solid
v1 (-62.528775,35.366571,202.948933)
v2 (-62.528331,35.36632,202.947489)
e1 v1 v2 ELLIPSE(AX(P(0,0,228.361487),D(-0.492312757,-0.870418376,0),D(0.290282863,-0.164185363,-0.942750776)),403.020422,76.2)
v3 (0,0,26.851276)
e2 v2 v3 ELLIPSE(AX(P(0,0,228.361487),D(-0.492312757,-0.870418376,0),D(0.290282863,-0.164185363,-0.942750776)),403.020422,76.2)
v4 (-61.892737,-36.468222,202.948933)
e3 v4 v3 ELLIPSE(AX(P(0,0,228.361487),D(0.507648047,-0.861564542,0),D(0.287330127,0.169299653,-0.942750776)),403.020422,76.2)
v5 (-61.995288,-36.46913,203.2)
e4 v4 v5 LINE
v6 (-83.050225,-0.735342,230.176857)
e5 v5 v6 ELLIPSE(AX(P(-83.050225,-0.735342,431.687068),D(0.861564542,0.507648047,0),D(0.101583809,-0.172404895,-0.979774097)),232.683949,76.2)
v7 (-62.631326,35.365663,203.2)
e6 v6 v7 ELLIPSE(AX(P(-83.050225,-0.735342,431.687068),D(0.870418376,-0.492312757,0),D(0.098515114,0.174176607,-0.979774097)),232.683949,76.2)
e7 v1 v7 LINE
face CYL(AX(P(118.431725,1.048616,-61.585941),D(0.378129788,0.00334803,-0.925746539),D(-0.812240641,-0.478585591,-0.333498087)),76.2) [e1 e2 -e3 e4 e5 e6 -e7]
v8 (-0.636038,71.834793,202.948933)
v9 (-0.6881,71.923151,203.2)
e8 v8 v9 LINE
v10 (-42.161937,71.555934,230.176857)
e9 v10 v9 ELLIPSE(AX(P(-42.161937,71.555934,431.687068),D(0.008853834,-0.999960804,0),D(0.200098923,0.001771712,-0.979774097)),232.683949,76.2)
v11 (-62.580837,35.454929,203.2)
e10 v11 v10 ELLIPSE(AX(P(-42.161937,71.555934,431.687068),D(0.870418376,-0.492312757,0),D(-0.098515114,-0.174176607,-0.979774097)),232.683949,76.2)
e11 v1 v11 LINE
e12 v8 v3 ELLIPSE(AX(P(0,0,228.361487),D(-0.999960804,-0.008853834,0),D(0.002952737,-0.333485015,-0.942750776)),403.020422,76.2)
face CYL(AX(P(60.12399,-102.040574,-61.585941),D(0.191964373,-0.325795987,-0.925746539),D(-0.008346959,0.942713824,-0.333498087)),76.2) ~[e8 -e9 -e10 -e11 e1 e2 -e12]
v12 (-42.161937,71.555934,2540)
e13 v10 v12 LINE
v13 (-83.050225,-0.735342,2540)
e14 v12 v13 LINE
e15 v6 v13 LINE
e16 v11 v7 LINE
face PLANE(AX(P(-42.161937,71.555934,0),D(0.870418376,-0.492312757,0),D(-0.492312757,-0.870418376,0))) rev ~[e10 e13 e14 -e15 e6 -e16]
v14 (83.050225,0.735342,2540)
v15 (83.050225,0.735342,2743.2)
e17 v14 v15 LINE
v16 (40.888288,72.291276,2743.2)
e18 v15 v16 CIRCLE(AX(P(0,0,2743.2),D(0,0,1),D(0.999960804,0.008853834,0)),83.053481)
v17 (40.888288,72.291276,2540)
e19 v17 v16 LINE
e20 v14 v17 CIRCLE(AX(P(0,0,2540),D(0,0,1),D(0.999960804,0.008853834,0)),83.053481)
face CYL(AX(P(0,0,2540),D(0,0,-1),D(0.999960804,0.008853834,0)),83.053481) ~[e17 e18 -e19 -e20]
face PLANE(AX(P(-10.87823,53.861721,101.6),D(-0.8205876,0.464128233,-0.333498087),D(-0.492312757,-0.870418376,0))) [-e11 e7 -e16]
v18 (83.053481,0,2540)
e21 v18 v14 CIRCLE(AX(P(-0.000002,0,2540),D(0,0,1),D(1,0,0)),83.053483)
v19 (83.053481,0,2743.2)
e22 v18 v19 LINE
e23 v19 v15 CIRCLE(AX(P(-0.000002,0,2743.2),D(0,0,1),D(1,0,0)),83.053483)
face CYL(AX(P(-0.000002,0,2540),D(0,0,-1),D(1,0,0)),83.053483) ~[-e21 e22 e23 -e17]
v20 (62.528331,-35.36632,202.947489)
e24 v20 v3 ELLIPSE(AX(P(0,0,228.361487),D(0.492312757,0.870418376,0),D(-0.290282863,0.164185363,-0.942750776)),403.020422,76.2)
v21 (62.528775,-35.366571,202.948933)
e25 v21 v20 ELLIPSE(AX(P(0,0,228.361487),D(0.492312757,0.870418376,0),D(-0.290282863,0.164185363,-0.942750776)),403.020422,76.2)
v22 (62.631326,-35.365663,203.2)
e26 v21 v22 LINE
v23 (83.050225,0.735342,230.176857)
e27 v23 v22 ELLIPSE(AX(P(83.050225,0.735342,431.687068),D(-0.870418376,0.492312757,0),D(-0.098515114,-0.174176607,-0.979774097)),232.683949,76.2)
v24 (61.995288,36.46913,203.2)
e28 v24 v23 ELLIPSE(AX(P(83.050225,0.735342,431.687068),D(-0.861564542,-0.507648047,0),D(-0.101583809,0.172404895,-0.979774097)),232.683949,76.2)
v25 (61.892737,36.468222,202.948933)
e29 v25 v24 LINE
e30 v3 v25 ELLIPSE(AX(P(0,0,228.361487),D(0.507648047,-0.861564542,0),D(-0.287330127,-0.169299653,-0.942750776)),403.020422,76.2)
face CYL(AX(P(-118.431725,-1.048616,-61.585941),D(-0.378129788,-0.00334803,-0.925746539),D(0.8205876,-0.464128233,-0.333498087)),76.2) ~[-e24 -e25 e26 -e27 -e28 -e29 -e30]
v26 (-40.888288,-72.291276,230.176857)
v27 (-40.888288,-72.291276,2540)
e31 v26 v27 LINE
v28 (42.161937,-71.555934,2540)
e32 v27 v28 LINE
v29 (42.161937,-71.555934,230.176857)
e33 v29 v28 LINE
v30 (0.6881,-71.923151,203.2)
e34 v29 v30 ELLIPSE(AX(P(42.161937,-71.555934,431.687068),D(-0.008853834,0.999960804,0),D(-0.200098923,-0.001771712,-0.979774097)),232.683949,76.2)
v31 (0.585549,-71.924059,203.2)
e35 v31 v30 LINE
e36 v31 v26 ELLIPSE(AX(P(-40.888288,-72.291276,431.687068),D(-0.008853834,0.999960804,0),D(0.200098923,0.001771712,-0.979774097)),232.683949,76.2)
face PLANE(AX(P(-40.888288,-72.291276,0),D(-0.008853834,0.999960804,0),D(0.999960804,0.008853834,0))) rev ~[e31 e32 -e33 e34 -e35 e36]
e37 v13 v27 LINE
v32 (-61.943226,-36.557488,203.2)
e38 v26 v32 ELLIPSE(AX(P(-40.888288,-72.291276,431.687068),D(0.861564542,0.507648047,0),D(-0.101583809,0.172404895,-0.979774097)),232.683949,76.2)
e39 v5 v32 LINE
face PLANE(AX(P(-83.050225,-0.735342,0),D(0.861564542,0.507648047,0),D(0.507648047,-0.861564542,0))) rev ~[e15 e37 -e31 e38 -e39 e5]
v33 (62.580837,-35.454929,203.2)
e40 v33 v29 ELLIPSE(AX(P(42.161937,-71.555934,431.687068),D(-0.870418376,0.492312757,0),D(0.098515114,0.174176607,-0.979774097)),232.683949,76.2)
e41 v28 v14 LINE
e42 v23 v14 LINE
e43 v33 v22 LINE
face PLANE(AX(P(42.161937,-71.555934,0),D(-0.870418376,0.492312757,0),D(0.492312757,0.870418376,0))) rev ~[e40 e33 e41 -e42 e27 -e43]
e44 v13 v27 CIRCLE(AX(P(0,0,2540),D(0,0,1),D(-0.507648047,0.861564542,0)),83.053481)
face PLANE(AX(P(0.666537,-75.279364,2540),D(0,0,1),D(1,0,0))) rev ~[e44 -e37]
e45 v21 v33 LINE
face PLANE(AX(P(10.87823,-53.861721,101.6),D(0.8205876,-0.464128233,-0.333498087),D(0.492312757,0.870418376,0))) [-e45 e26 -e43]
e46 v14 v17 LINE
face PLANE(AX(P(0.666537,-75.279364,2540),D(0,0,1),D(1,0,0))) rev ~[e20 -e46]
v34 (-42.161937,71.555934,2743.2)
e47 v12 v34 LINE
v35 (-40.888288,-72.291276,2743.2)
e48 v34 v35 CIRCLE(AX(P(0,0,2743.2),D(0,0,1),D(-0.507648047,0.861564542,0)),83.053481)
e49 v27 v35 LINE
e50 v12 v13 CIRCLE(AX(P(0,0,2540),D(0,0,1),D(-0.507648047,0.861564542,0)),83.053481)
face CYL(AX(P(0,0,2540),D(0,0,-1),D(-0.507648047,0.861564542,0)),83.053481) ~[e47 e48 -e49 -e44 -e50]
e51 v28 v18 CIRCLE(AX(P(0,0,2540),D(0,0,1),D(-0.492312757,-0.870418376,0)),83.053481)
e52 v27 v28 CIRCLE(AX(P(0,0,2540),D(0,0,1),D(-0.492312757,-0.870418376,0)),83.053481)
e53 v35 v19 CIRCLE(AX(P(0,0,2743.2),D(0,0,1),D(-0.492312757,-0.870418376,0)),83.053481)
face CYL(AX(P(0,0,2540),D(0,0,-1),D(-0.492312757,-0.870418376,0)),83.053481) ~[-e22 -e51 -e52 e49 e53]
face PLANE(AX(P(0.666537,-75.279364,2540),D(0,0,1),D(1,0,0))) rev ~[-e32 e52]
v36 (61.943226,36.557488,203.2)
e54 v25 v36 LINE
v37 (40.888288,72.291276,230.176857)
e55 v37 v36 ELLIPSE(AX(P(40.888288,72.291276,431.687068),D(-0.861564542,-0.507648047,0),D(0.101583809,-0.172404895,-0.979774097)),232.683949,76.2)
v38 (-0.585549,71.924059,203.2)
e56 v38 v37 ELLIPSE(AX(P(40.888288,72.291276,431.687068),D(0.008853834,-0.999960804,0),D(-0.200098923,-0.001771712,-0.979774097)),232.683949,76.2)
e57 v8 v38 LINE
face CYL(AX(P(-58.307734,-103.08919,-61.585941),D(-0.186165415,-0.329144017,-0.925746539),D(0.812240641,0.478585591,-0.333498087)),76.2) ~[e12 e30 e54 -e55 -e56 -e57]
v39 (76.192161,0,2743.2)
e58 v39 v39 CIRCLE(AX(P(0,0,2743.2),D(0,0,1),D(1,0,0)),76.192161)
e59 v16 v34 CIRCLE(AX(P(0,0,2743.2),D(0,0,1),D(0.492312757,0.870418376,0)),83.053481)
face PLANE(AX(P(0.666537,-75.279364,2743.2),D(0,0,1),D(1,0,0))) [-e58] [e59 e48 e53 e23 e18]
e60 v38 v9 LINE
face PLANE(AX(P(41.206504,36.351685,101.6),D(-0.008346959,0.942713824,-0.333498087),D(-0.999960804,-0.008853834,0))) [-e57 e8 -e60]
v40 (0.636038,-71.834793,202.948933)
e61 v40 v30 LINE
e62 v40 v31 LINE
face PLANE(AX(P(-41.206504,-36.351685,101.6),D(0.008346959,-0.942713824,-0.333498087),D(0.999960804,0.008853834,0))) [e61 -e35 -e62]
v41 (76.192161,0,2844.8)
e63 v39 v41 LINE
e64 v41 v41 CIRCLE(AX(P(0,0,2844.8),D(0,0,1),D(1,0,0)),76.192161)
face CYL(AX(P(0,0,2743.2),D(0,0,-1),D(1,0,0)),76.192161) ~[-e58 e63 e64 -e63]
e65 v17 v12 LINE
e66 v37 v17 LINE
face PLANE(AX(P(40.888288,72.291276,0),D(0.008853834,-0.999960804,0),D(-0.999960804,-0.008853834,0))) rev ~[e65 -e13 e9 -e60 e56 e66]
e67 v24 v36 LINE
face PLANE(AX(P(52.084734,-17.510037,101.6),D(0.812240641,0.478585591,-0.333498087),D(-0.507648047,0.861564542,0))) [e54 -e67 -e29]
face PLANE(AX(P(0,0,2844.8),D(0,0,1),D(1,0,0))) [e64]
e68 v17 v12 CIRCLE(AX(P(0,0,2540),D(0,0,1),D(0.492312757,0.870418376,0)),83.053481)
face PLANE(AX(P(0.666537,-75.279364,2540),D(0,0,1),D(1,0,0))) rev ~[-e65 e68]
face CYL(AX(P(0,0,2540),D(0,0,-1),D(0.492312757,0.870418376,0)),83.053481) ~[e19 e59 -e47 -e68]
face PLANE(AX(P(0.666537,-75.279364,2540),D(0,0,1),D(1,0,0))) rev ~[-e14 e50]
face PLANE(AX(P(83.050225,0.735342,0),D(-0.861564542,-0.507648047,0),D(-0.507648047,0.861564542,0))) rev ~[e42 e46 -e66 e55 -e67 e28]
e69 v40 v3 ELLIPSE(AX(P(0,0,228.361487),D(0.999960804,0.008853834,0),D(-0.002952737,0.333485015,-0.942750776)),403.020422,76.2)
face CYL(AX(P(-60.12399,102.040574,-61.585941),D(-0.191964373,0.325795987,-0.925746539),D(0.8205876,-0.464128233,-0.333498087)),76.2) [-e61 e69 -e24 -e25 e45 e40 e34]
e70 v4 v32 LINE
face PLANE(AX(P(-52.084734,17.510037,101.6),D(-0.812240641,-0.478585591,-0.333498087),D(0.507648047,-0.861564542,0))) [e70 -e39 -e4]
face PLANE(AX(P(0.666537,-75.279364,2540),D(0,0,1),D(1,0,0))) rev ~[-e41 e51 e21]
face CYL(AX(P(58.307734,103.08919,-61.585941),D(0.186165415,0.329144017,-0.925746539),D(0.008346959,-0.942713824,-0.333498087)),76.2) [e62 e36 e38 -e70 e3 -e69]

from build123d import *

# Parameters (mm, degrees)
F1_DEPTH     = 2540
F3_DEPTH     = 203.2
F4_R         = 76.1921609871
F5_DEPTH     = 101.6
F6_SIZE2     = 203.2
F6_SIZE      = 71.882
F7_T1_DEPTH  = 494.4083201135
F7_T3_DEPTH  = 494.4083201135
F7_T5_DEPTH  = 494.4083201135
F7_T7_DEPTH  = 494.4083201135
F7_T9_DEPTH  = 494.4083201135
F7_T11_DEPTH = 494.4083201135


# Not quite as in the source:
# - a fillet or chamfer that OpenCascade refuses, or shapes differently, is made with other operations: its cross-section is extruded or revolved along the edge and cut away or added


with BuildPart() as f1:
    # F0 (on Top) → F1 (new body)
    with BuildSketch(Plane.XY):
        Polygon((42.1619373396, -71.5559341018), (83.0502253935, 0.735341758), (40.8882880539, 72.2912758598), (-42.1619373396, 71.5559341018), (-83.0502253935, -0.735341758), (-40.8882880539, -72.2912758598), align=None)
    extrude(amount=F1_DEPTH)

    # F2 (on face) → F3 (join)
    with BuildSketch(Plane.XY.offset(2540)):
        with BuildLine():
            ThreePointArc((-40.8882880539, -72.2912758598), (0.735341758, -83.0502253935), (42.1619373396, -71.5559341018))
            Line((42.1619373396, -71.5559341018), (-40.8882880539, -72.2912758598))
        make_face()
        with BuildLine():
            ThreePointArc((-83.0502253935, -0.735341758), (-71.5559341018, -42.1619373396), (-40.8882880539, -72.2912758598))
            Line((-40.8882880539, -72.2912758598), (-83.0502253935, -0.735341758))
        make_face()
        with BuildLine():
            Line((-83.0502253935, -0.735341758), (-42.1619373396, 71.5559341018))
            ThreePointArc((-42.1619373396, 71.5559341018), (-72.2912758598, 40.8882880539), (-83.0502253935, -0.735341758))
        make_face()
        Polygon((42.1619373396, -71.5559341018), (83.0502253935, 0.735341758), (40.8882880539, 72.2912758598), (-42.1619373396, 71.5559341018), (-83.0502253935, -0.735341758), (-40.8882880539, -72.2912758598), align=None)
        with BuildLine():
            ThreePointArc((42.1619373396, -71.5559341018), (72.1095566371, -41.2079180135), (83.0534807543, 0))
            ThreePointArc((83.0534807543, 0), (83.0526669101, 0.3676744818), (83.0502253935, 0.735341758))
            Line((83.0502253935, 0.735341758), (42.1619373396, -71.5559341018))
        make_face()
        with BuildLine():
            Line((40.8882880539, 72.2912758598), (83.0502253935, 0.735341758))
            ThreePointArc((83.0502253935, 0.735341758), (71.5559341018, 42.1619373396), (40.8882880539, 72.2912758598))
        make_face()
        with BuildLine():
            Line((-42.1619373396, 71.5559341018), (40.8882880539, 72.2912758598))
            ThreePointArc((40.8882880539, 72.2912758598), (-0.735341758, 83.0502253935), (-42.1619373396, 71.5559341018))
        make_face()
    extrude(amount=F3_DEPTH)

    # F4 (on face) → F5 (join)
    with BuildSketch(Plane.XY.offset(2743.2)):
        Circle(F4_R)
    extrude(amount=F5_DEPTH)

    # F6
    f6_edges = [f1.edges().sort_by_distance(p)[0] for p in [
        (62.606081, -35.410296, 0),
        (61.969257, 36.513309, 0),
        (-0.636825, 71.923605, 0),
        (-62.606081, 35.410296, 0),
        (-61.969257, -36.513309, 0),
        (0.636825, -71.923605, 0),
    ]]
    f6_side = f1.faces().sort_by_distance((0, 0, 0))[0]
    chamfer(f6_edges, length=F6_SIZE, length2=F6_SIZE2, reference=f6_side)

    # F7: fillet of radius 76.2 on 6 edges, made by hand

    # F7_s2 → F7_t1 (cut)
    with BuildSketch(Plane(origin=(-18.9514614698, -33.5065465998, -94.2401135792), x_dir=(-0.8704183762, 0.4923127566, 0), z_dir=(0.1861654151, 0.329144017, 0.9257465389))):
        with BuildLine():
            ThreePointArc((-35.9188045712, 19.1503954496), (0, 10.1536652969), (35.9188045712, 19.1503954496))
            Line((35.9188045712, 19.1503954496), (0, -0.0474877004))
            Line((0, -0.0474877004), (-35.9188045712, 19.1503954496))
        make_face()
    extrude(amount=F7_T1_DEPTH, mode=Mode.SUBTRACT)

    # F7_s4 → F7_t3 (cut)
    with BuildSketch(Plane(origin=(19.5417898136, -33.1657203716, -94.2401135792), x_dir=(-0.8615645419, -0.5076480475, 0), z_dir=(-0.1919643727, 0.3257959873, 0.9257465389))):
        with BuildLine():
            ThreePointArc((-35.9188045712, 19.1503954496), (0, 10.1536652969), (35.9188045712, 19.1503954496))
            Line((35.9188045712, 19.1503954496), (0, -0.0474877004))
            Line((0, -0.0474877004), (-35.9188045712, 19.1503954496))
        make_face()
    extrude(amount=F7_T3_DEPTH, mode=Mode.SUBTRACT)

    # F7_s6 → F7_t5 (cut)
    with BuildSketch(Plane(origin=(38.4932512834, 0.3408262282, -94.2401135792), x_dir=(0.0088538343, -0.999960804, 0), z_dir=(-0.3781297878, -0.0033480297, 0.9257465389))):
        with BuildLine():
            ThreePointArc((35.9188045712, 19.1503954496), (0, 10.1536652969), (-35.9188045712, 19.1503954496))
            Line((-35.9188045712, 19.1503954496), (0, -0.0474877004))
            Line((0, -0.0474877004), (35.9188045712, 19.1503954496))
        make_face()
    extrude(amount=F7_T5_DEPTH, mode=Mode.SUBTRACT)

    # F7_s8 → F7_t7 (cut)
    with BuildSketch(Plane(origin=(18.9514614698, 33.5065465998, -94.2401135792), x_dir=(0.8704183762, -0.4923127566, 0), z_dir=(-0.1861654151, -0.329144017, 0.9257465389))):
        with BuildLine():
            ThreePointArc((35.9188045712, 19.1503954496), (0, 10.1536652969), (-35.9188045712, 19.1503954496))
            Line((-35.9188045712, 19.1503954496), (0, -0.0474877004))
            Line((0, -0.0474877004), (35.9188045712, 19.1503954496))
        make_face()
    extrude(amount=F7_T7_DEPTH, mode=Mode.SUBTRACT)

    # F7_s10 → F7_t9 (cut)
    with BuildSketch(Plane(origin=(-19.5417898136, 33.1657203716, -94.2401135792), x_dir=(0.8615645419, 0.5076480475, 0), z_dir=(0.1919643727, -0.3257959873, 0.9257465389))):
        with BuildLine():
            ThreePointArc((35.9188045712, 19.1503954496), (0, 10.1536652969), (-35.9188045712, 19.1503954496))
            Line((-35.9188045712, 19.1503954496), (0, -0.0474877004))
            Line((0, -0.0474877004), (35.9188045712, 19.1503954496))
        make_face()
    extrude(amount=F7_T9_DEPTH, mode=Mode.SUBTRACT)

    # F7_s12 → F7_t11 (cut)
    with BuildSketch(Plane(origin=(-38.4932512834, -0.3408262282, -94.2401135792), x_dir=(-0.0088538343, 0.999960804, 0), z_dir=(0.3781297878, 0.0033480297, 0.9257465389))):
        with BuildLine():
            ThreePointArc((-35.9188045712, 19.1503954496), (0, 10.1536652969), (35.9188045712, 19.1503954496))
            Line((35.9188045712, 19.1503954496), (0, -0.0474877004))
            Line((0, -0.0474877004), (-35.9188045712, 19.1503954496))
        make_face()
    extrude(amount=F7_T11_DEPTH, mode=Mode.SUBTRACT)


solid = f1.part
